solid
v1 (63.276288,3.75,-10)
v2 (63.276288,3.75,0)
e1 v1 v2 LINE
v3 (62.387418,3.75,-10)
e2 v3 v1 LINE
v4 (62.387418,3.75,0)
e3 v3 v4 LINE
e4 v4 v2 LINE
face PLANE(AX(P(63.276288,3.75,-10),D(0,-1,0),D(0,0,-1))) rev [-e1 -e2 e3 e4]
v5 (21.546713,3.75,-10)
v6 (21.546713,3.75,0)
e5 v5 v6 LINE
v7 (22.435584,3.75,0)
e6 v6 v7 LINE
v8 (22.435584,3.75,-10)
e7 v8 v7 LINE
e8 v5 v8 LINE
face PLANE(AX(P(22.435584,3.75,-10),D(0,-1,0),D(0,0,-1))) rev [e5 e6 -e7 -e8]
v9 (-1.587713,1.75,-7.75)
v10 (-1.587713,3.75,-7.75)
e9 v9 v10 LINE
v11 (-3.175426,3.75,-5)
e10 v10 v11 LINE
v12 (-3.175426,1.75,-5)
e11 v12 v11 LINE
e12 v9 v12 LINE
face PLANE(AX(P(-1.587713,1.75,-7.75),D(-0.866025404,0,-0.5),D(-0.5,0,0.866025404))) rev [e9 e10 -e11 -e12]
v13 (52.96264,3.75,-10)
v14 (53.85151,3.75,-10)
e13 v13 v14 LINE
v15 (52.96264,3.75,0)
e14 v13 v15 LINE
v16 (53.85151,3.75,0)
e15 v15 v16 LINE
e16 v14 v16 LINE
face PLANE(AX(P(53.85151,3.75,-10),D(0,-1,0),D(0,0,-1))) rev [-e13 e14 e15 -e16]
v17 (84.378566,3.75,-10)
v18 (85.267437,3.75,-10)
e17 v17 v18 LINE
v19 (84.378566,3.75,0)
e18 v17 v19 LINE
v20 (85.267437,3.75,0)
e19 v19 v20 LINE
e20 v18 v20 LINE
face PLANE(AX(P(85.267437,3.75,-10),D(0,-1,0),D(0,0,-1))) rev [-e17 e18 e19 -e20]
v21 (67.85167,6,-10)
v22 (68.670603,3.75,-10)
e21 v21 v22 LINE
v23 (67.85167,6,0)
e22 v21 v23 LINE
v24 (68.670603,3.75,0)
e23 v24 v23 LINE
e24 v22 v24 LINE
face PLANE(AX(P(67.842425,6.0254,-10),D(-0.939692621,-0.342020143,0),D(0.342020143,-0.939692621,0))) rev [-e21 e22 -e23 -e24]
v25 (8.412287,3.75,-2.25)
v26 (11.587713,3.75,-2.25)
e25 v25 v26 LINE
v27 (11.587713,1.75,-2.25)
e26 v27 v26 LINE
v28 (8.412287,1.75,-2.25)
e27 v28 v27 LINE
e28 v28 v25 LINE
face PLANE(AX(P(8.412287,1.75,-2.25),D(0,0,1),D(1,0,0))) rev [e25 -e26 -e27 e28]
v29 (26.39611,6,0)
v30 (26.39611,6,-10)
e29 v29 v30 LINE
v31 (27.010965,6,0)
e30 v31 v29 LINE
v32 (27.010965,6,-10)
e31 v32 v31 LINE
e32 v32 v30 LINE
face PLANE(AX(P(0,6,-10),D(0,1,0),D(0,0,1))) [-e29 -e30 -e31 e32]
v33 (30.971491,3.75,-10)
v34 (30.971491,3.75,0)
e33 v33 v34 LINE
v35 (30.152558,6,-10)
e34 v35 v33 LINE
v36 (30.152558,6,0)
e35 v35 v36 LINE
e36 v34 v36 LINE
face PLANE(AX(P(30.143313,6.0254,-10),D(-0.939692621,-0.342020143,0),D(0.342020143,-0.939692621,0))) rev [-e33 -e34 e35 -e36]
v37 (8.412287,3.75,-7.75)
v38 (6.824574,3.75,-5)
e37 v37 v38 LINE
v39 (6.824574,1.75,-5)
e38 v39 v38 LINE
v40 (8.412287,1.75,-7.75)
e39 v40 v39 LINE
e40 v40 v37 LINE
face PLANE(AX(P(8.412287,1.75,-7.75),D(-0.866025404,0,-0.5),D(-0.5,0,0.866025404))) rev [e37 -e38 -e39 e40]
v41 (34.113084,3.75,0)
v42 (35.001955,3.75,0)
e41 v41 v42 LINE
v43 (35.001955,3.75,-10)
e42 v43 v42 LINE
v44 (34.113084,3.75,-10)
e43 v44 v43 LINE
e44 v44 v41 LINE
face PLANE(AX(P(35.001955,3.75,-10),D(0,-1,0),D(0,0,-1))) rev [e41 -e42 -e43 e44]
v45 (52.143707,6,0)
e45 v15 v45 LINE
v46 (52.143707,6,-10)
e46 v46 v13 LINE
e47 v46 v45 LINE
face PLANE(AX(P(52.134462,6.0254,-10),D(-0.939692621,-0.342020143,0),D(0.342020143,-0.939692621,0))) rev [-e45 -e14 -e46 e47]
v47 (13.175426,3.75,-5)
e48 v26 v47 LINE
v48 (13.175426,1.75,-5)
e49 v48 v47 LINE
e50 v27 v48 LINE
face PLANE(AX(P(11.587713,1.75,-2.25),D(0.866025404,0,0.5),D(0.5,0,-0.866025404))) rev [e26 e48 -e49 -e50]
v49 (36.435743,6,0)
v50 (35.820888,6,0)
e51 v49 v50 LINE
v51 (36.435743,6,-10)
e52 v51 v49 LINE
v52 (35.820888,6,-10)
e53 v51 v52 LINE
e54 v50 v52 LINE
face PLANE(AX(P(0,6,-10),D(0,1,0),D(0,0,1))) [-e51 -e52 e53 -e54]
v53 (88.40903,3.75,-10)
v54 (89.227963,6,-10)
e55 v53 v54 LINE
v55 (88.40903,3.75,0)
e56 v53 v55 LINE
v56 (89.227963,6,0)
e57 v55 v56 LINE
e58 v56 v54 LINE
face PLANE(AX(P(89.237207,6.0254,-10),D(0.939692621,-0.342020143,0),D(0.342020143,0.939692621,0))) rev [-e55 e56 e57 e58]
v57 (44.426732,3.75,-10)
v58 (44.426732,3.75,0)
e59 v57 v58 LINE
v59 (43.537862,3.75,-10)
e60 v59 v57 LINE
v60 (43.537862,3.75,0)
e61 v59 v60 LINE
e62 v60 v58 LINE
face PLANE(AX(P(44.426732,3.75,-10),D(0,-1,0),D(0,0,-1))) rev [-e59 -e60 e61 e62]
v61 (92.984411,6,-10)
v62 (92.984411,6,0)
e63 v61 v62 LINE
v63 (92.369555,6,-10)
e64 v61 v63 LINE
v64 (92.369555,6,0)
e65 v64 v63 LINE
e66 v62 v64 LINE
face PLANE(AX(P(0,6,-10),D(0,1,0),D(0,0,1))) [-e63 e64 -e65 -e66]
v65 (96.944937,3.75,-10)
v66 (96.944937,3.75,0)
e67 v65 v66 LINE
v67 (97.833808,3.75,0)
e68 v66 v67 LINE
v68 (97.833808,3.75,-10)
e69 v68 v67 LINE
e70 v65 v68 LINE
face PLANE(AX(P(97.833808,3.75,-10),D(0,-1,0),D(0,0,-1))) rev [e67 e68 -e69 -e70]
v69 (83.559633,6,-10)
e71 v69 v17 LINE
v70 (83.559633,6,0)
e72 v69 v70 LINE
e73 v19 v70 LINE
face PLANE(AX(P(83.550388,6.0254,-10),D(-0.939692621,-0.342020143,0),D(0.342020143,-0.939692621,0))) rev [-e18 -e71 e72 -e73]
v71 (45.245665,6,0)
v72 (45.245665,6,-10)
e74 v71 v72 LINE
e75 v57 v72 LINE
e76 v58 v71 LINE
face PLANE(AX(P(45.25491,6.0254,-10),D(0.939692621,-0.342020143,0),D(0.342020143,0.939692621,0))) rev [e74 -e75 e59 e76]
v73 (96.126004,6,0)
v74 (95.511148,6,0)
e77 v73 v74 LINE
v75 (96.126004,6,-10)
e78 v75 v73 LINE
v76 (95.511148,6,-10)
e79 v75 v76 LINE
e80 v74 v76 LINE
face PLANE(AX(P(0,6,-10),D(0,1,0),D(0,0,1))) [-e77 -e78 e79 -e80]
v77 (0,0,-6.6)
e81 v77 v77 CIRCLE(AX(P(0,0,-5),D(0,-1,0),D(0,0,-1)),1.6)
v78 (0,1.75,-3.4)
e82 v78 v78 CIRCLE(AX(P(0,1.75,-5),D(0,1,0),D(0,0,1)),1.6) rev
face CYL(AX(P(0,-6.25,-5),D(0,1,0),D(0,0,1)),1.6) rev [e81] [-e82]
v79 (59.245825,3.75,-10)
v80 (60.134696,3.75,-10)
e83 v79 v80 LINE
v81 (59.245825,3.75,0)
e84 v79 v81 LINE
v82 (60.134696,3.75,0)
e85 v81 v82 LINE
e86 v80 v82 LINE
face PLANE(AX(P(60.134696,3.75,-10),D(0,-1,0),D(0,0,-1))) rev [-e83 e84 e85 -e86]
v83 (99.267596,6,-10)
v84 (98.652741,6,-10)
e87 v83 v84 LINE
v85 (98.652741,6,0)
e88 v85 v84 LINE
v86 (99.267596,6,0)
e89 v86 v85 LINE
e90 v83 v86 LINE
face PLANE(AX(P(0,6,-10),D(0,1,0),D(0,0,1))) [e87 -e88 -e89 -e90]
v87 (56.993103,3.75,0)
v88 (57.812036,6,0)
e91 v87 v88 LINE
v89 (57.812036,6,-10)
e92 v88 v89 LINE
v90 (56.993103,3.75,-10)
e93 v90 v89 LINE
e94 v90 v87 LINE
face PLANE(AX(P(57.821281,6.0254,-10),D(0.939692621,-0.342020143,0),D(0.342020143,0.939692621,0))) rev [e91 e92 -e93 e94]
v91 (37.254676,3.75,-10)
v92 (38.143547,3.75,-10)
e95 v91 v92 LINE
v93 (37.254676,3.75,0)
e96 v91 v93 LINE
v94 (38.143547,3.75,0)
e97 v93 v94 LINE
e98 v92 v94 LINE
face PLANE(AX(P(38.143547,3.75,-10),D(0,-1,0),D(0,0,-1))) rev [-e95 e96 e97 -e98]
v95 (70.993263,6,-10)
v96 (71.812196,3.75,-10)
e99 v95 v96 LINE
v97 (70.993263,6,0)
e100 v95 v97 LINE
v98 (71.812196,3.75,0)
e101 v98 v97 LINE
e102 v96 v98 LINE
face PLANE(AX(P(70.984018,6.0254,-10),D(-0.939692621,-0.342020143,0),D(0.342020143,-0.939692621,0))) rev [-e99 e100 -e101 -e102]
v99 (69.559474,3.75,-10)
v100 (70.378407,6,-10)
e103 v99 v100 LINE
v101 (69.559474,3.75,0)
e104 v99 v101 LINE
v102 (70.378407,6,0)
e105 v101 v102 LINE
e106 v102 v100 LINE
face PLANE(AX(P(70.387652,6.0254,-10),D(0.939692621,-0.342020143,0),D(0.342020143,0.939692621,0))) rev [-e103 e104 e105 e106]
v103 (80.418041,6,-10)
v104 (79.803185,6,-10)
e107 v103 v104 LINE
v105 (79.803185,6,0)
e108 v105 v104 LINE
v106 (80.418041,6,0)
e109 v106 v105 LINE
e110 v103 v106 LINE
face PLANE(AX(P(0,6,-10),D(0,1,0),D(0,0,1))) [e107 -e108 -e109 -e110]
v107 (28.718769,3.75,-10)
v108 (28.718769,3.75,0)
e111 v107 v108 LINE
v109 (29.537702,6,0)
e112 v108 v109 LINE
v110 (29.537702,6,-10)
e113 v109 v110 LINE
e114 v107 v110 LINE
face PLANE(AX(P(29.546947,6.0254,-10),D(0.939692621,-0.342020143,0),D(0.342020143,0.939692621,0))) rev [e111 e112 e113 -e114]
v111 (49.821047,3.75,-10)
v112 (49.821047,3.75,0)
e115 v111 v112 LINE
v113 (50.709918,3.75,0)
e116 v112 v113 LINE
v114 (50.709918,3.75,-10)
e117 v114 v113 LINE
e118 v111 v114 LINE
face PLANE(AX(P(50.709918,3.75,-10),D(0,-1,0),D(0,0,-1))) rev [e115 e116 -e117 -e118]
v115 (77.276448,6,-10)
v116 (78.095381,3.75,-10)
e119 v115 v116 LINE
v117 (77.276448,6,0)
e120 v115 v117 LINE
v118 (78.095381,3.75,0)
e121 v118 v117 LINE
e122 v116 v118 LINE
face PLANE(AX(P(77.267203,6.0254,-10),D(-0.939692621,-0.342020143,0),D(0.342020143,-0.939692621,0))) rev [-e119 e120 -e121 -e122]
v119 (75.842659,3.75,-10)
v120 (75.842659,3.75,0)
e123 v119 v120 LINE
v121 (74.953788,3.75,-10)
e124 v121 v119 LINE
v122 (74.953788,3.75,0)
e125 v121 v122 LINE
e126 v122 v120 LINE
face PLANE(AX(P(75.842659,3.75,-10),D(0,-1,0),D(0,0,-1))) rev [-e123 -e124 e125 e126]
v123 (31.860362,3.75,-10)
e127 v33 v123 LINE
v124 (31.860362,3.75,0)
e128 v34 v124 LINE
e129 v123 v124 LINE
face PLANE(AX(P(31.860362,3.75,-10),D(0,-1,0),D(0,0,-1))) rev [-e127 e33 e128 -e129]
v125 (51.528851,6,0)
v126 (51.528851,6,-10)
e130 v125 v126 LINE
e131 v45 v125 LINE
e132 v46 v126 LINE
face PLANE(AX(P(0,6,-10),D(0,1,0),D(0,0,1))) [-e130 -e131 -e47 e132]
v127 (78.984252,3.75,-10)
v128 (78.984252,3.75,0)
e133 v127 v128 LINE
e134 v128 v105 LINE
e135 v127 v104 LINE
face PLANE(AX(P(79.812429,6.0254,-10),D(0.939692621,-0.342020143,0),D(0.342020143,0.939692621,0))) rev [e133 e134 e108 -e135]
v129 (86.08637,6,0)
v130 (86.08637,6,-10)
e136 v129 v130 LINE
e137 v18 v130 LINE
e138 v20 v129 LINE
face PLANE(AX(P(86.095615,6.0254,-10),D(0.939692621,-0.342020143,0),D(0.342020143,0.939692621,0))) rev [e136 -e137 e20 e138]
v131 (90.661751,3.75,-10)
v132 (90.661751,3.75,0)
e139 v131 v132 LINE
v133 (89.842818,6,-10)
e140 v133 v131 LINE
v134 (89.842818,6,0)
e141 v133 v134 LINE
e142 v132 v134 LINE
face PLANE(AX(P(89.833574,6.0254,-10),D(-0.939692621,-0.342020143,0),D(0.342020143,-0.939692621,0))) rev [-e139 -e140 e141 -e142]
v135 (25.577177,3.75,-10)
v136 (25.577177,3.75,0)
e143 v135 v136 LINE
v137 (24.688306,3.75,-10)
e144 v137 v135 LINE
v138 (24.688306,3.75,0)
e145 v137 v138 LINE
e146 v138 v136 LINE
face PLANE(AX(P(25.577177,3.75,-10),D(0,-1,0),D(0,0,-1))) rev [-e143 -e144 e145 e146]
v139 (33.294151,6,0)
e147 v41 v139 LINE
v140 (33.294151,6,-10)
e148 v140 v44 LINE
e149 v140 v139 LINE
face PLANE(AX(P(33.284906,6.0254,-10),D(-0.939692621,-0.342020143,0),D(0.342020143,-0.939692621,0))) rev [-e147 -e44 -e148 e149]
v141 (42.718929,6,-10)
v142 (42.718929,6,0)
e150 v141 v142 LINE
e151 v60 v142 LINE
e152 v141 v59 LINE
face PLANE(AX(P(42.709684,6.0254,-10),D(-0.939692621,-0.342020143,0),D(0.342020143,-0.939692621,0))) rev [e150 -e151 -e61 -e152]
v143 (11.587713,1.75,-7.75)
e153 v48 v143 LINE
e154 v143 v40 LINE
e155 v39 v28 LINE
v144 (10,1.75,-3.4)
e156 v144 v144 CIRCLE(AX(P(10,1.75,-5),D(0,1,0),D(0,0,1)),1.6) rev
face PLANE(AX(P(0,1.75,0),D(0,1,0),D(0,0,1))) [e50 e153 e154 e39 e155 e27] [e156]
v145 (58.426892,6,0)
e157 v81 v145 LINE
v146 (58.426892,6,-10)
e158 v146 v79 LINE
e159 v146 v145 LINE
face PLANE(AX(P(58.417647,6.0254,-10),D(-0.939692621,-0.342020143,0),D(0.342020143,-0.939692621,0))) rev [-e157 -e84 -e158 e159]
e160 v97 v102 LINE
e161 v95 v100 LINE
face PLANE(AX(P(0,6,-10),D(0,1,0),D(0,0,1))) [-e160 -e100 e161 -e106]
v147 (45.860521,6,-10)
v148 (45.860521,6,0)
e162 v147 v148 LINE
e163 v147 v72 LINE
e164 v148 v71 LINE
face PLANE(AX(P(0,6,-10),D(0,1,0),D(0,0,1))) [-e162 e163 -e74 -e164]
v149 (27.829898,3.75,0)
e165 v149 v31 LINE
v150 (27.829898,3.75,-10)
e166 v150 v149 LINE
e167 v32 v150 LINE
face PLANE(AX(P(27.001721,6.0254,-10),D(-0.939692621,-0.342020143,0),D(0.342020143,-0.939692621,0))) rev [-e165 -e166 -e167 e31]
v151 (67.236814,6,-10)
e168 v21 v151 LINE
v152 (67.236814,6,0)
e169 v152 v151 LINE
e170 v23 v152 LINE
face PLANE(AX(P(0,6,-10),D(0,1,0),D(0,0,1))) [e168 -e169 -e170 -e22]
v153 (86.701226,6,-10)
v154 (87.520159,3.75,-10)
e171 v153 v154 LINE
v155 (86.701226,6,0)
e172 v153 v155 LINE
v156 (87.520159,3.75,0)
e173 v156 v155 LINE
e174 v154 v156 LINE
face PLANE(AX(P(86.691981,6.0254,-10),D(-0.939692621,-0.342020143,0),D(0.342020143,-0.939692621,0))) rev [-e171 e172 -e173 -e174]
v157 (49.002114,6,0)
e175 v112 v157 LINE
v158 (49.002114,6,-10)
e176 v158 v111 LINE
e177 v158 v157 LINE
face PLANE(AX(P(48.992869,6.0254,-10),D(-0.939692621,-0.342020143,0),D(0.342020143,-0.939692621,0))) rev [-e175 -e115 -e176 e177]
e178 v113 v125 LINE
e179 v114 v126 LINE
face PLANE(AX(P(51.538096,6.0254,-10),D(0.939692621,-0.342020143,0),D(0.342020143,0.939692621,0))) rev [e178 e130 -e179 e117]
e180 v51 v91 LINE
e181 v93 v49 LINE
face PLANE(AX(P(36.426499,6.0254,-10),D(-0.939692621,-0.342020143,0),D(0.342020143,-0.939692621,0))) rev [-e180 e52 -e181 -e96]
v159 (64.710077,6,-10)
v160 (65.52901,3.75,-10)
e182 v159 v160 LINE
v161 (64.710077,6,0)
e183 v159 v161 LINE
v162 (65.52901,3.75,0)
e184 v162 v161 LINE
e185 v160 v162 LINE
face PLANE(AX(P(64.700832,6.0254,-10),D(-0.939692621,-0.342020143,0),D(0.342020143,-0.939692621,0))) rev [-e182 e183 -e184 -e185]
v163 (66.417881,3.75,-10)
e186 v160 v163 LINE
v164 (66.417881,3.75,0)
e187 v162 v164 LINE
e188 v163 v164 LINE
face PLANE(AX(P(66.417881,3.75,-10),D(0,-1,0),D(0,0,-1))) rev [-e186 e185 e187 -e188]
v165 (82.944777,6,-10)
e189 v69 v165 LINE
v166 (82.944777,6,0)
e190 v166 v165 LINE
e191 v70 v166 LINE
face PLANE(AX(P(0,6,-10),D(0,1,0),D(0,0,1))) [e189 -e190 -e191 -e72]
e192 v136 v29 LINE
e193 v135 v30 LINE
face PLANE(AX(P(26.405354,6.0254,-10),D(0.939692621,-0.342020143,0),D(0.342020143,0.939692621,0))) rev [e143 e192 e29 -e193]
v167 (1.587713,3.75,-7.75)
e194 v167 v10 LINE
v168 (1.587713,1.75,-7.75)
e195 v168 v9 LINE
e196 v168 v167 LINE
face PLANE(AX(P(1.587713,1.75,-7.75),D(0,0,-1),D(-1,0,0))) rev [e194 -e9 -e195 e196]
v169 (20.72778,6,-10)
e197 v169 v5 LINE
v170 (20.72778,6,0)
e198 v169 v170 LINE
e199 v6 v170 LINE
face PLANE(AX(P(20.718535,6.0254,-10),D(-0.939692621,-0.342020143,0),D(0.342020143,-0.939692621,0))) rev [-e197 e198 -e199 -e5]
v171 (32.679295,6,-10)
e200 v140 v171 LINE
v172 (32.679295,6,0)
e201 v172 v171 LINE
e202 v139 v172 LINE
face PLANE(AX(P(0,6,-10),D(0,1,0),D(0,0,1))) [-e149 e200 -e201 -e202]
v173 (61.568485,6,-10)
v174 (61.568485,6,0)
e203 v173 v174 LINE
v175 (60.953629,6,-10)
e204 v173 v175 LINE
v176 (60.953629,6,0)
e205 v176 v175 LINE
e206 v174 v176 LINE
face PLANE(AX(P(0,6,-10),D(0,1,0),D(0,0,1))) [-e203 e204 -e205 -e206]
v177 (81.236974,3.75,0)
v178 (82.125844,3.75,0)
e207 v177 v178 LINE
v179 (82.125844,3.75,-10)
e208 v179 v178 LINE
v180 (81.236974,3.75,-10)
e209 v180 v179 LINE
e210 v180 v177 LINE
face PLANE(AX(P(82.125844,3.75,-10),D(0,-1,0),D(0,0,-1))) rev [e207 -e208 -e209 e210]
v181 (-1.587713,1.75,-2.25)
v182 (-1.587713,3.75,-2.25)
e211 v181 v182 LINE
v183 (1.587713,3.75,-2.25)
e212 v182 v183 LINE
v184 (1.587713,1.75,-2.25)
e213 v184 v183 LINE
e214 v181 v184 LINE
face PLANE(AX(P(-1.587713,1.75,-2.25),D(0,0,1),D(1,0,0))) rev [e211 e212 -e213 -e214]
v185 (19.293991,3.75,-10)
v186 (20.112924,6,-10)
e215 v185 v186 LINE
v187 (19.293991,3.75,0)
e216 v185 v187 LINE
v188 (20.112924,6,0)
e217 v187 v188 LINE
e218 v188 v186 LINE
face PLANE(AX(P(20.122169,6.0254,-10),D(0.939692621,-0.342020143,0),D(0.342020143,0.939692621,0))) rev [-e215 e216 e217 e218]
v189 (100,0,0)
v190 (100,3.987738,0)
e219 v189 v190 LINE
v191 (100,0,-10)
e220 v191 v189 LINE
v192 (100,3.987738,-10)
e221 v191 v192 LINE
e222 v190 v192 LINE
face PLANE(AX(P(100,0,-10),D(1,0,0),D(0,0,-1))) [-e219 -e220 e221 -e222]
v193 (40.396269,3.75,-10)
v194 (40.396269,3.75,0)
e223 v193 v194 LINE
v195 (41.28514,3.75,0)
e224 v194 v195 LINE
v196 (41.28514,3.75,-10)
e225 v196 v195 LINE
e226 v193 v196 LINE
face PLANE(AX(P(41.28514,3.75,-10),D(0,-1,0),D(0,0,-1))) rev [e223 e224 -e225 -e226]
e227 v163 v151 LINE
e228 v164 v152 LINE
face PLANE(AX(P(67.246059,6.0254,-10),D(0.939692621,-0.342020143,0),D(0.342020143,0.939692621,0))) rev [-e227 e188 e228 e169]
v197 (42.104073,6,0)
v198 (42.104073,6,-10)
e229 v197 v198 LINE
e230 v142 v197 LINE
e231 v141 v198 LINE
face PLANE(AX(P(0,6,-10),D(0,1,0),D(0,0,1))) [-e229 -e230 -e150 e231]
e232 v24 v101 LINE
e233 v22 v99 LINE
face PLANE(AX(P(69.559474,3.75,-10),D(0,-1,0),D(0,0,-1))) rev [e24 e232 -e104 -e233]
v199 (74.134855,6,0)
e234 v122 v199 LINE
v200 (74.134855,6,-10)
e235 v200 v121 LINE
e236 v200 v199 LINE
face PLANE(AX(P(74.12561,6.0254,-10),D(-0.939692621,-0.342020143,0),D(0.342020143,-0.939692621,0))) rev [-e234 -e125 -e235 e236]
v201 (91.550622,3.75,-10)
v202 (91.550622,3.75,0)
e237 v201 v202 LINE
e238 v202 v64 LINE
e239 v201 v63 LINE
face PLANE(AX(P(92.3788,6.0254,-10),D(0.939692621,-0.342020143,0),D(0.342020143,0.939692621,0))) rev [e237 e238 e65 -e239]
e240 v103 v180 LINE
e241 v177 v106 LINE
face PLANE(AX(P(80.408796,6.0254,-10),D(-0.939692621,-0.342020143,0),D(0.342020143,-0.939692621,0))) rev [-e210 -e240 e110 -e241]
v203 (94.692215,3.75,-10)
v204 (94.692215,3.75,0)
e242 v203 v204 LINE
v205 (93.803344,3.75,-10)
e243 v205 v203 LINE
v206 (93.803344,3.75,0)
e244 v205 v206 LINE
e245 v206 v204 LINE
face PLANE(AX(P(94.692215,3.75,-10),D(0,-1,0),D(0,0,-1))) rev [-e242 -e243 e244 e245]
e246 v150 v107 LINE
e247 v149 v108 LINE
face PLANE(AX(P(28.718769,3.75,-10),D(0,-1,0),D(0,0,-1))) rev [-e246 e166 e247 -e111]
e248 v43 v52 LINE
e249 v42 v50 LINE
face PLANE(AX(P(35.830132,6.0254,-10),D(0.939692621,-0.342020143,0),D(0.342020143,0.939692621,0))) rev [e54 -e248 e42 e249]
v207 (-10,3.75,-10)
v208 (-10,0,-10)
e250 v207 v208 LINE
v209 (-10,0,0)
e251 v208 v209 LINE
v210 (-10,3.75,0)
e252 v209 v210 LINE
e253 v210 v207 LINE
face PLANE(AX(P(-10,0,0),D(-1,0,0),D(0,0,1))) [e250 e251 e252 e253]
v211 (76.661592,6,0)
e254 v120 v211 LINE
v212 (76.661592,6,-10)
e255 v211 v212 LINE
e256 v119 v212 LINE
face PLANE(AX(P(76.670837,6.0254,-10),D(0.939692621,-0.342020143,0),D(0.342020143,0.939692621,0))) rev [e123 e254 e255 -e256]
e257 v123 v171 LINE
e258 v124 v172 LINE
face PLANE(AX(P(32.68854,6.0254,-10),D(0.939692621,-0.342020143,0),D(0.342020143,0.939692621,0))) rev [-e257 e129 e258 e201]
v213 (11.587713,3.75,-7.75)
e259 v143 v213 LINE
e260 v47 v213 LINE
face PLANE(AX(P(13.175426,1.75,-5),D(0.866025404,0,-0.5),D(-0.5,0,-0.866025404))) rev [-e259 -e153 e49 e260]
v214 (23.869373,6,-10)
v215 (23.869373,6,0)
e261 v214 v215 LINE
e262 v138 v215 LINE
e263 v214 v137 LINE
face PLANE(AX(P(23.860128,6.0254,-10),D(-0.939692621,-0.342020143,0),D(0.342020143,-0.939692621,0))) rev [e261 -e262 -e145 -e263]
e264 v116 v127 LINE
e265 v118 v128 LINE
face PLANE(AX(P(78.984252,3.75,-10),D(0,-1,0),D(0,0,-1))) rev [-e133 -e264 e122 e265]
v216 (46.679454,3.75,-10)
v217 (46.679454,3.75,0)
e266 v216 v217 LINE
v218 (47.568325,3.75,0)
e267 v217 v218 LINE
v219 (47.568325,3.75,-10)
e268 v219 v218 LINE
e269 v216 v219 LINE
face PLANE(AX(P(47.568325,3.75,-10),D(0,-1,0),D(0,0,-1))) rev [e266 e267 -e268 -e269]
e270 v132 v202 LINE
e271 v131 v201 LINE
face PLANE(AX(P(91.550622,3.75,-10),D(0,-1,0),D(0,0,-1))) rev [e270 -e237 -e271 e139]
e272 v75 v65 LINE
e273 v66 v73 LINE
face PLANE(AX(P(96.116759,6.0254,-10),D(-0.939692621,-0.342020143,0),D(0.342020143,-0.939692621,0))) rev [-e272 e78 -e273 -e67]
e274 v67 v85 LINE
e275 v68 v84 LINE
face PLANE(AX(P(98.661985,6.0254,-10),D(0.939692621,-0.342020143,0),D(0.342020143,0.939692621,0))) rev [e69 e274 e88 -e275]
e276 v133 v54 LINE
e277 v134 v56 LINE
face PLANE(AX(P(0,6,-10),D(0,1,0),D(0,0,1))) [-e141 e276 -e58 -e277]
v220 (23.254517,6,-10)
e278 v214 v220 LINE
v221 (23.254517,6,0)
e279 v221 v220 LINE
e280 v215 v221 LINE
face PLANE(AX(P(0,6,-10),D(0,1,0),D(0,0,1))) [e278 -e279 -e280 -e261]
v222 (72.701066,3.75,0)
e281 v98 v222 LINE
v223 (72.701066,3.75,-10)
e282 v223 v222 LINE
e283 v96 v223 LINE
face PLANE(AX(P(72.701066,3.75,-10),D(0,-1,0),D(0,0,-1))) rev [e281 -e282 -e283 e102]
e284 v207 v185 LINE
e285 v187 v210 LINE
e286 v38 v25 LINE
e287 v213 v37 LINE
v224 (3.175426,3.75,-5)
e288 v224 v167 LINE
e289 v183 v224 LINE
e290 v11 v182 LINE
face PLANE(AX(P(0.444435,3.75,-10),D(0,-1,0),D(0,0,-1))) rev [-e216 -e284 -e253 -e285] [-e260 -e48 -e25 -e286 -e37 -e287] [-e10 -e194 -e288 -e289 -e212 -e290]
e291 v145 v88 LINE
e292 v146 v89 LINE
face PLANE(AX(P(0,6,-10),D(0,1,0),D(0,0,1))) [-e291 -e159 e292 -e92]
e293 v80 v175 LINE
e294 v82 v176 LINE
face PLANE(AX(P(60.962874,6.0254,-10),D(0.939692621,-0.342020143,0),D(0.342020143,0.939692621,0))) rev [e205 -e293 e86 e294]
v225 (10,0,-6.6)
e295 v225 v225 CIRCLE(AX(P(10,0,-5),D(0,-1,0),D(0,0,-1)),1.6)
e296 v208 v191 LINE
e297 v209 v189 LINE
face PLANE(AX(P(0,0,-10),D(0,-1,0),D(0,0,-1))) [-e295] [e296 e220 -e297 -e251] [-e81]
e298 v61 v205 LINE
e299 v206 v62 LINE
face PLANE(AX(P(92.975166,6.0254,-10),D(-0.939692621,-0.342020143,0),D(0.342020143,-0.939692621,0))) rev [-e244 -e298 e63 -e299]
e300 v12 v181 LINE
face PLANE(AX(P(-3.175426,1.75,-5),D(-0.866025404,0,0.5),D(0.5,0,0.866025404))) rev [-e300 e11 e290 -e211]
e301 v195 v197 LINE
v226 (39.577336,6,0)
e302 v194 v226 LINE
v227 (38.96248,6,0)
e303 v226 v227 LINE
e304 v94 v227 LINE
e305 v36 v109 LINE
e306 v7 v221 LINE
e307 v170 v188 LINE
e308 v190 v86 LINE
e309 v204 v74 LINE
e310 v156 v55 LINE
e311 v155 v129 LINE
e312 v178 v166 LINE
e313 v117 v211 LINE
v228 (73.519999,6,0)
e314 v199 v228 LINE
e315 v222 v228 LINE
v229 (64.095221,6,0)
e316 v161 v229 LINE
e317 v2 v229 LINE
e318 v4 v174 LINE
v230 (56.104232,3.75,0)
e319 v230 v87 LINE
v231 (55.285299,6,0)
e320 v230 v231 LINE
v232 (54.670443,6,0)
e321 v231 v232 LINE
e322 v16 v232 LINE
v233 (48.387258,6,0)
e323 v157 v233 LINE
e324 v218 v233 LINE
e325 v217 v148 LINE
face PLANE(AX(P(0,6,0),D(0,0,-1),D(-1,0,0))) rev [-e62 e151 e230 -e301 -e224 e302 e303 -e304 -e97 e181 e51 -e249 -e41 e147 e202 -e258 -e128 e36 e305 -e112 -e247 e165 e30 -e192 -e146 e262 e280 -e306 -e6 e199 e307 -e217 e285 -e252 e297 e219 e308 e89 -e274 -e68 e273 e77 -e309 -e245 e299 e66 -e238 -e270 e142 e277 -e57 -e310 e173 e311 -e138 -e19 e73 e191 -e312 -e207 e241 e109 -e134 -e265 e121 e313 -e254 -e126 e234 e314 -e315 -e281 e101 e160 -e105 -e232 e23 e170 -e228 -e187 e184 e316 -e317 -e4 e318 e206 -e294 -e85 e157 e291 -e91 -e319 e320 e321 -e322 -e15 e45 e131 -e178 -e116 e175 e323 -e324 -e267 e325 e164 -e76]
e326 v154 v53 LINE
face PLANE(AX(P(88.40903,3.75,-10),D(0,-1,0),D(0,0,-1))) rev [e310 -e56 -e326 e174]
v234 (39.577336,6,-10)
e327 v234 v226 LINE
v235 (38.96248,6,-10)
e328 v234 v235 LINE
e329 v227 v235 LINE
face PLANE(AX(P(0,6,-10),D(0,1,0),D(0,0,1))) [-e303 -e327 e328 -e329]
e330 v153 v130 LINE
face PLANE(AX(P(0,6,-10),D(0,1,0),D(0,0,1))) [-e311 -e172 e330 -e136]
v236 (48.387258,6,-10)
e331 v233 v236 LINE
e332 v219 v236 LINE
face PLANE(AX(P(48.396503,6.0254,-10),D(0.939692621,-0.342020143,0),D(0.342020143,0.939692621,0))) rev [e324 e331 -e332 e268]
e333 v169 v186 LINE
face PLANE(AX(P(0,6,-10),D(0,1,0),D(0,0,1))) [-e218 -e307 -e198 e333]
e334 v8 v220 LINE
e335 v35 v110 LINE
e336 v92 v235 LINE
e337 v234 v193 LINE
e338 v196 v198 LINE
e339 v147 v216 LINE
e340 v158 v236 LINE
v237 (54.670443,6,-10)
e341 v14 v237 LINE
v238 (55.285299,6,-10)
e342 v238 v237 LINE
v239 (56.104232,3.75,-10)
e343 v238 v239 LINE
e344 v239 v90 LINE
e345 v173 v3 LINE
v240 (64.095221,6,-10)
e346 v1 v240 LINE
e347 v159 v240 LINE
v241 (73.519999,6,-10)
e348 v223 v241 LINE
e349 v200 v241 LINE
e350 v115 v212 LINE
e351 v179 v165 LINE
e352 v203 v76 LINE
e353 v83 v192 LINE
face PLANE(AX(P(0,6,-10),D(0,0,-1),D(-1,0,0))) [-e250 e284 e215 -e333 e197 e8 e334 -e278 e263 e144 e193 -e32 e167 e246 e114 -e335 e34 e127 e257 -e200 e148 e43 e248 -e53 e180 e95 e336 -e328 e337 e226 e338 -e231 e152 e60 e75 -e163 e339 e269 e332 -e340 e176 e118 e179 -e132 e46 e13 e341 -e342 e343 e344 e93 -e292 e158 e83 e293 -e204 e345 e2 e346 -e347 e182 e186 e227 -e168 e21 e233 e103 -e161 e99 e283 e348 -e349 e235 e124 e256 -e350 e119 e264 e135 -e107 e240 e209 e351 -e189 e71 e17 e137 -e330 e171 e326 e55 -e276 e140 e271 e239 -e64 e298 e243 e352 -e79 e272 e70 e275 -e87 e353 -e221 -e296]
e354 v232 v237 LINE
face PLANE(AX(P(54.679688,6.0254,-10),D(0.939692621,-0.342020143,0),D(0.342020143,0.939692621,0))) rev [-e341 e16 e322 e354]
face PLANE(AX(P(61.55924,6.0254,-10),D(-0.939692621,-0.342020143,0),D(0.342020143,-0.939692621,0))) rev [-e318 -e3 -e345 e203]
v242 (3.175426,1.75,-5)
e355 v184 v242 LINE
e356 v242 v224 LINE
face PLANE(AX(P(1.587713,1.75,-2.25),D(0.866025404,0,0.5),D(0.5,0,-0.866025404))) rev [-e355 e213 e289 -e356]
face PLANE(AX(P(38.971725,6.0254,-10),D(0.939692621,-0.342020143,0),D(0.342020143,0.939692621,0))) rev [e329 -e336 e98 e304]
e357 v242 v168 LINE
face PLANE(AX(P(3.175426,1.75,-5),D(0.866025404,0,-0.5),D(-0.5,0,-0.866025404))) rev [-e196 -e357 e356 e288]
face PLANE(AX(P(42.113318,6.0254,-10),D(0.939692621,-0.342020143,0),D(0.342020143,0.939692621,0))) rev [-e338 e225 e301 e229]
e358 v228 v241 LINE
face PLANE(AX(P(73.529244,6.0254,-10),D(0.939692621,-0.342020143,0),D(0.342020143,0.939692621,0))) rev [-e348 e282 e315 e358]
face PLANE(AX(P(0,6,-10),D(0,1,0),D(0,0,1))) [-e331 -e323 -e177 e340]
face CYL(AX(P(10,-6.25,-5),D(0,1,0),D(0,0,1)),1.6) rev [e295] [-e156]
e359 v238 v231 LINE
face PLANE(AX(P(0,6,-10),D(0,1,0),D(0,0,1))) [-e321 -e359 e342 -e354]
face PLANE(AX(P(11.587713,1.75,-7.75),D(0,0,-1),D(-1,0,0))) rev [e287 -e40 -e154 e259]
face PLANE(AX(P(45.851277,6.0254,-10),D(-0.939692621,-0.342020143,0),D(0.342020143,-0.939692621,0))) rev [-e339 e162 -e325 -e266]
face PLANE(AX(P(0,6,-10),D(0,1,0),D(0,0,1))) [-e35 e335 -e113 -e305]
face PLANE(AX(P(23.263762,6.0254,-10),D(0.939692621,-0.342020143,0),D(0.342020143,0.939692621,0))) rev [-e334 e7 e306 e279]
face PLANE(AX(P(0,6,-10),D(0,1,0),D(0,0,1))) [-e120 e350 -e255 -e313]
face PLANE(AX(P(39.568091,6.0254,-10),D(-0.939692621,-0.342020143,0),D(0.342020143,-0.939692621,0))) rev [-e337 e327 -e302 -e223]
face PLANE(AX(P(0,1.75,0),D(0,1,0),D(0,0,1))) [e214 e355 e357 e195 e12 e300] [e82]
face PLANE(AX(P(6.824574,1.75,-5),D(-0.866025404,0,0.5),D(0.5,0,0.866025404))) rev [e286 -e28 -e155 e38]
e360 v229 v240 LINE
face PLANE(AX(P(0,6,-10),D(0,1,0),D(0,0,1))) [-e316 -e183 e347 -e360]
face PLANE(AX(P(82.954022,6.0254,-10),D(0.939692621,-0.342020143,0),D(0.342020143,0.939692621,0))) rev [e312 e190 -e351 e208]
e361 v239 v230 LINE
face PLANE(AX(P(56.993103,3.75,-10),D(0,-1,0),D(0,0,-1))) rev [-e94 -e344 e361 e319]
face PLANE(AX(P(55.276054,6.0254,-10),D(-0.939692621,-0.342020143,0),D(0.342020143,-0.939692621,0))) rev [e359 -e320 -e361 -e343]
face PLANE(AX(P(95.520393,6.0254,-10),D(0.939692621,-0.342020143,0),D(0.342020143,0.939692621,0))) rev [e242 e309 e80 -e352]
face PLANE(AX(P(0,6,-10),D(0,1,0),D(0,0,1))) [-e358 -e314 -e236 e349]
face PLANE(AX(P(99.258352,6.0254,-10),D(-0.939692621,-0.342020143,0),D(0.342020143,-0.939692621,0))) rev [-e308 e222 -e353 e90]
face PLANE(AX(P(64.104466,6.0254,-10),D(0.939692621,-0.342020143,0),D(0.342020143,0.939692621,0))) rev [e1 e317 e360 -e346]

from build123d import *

# Parameters (mm, degrees)
BLANKSKE_W          = 100
BLANKSKE_H          = 6
BLANK_DEPTH         = 10
TOOTHCUTSIM_DEPTH   = 101.677703589
TEETHCUTS_COUNT     = 33
TEETHCUTS_PITCH     = 3.14159265
SKETCH_1_W          = 19.29399127
SKETCH_1_H          = 9.471097972
CUT_EXTRUDE_1_DEPTH = 10
SKETCH_2_W          = 10
SKETCH_2_H          = 3.75
EXTRUDE_1_DEPTH     = 10
SKETCH_3_R          = 1.6
CUT_EXTRUDE_2_DEPTH = 10
CUT_EXTRUDE_3_DEPTH = 2


with BuildPart() as part:
    # BlankSke → Blank (new body)
    with BuildSketch(Plane.XY):
        with Locations((50, 3)):
            Rectangle(BLANKSKE_W, BLANKSKE_H)
    extrude(amount=-BLANK_DEPTH)

    # TooCutSkeSim → ToothCutSim (cut, through all)
    with BuildSketch(Plane.XY):
        Polygon((0.44443537, 3.75), (-0.44443537, 3.75), (-1.272613241, 6.0254), (1.272613241, 6.0254), align=None)
    toothcutsim = extrude(amount=-TOOTHCUTSIM_DEPTH, mode=Mode.SUBTRACT)

    # TeethCuts: ToothCutSim ×33
    with Locations(*[(i * TEETHCUTS_PITCH, 0, 0) for i in range(1, TEETHCUTS_COUNT)]):
        add(toothcutsim, mode=Mode.SUBTRACT)

    # 草图1 → 切除-拉伸1 (cut)
    with BuildSketch(Plane.XY):
        with Locations((9.646995635, 8.485548986)):
            Rectangle(SKETCH_1_W, SKETCH_1_H)
    extrude(amount=-CUT_EXTRUDE_1_DEPTH, mode=Mode.SUBTRACT)

    # 草图2 → 凸台-拉伸1 (add)
    with BuildSketch(Plane.ZY):
        with Locations((-5, 1.875)):
            Rectangle(SKETCH_2_W, SKETCH_2_H)
    extrude(amount=EXTRUDE_1_DEPTH)

    # 草图3 → 切除-拉伸2 (cut)
    with BuildSketch(Plane(origin=(0, 3.75, 0), x_dir=(1, 0, 0), z_dir=(0, 1, 0))):
        with Locations((0, 5)):
            Circle(SKETCH_3_R)
        with Locations((10, 5)):
            Circle(SKETCH_3_R)
    extrude(amount=-CUT_EXTRUDE_2_DEPTH, mode=Mode.SUBTRACT)

    # 草图4 → 切除-拉伸3 (cut)
    with BuildSketch(Plane(origin=(0, 3.75, 0), x_dir=(1, 0, 0), z_dir=(0, 1, 0))):
        Polygon((-1.58771324, 7.75), (-3.175426481, 5), (-1.58771324, 2.25), (1.58771324, 2.25), (3.175426481, 5), (1.58771324, 7.75), align=None)
        Polygon((8.41228676, 7.75), (6.824573519, 5), (8.41228676, 2.25), (11.58771324, 2.25), (13.175426481, 5), (11.58771324, 7.75), align=None)
    extrude(amount=-CUT_EXTRUDE_3_DEPTH, mode=Mode.SUBTRACT)


solid = part.part
